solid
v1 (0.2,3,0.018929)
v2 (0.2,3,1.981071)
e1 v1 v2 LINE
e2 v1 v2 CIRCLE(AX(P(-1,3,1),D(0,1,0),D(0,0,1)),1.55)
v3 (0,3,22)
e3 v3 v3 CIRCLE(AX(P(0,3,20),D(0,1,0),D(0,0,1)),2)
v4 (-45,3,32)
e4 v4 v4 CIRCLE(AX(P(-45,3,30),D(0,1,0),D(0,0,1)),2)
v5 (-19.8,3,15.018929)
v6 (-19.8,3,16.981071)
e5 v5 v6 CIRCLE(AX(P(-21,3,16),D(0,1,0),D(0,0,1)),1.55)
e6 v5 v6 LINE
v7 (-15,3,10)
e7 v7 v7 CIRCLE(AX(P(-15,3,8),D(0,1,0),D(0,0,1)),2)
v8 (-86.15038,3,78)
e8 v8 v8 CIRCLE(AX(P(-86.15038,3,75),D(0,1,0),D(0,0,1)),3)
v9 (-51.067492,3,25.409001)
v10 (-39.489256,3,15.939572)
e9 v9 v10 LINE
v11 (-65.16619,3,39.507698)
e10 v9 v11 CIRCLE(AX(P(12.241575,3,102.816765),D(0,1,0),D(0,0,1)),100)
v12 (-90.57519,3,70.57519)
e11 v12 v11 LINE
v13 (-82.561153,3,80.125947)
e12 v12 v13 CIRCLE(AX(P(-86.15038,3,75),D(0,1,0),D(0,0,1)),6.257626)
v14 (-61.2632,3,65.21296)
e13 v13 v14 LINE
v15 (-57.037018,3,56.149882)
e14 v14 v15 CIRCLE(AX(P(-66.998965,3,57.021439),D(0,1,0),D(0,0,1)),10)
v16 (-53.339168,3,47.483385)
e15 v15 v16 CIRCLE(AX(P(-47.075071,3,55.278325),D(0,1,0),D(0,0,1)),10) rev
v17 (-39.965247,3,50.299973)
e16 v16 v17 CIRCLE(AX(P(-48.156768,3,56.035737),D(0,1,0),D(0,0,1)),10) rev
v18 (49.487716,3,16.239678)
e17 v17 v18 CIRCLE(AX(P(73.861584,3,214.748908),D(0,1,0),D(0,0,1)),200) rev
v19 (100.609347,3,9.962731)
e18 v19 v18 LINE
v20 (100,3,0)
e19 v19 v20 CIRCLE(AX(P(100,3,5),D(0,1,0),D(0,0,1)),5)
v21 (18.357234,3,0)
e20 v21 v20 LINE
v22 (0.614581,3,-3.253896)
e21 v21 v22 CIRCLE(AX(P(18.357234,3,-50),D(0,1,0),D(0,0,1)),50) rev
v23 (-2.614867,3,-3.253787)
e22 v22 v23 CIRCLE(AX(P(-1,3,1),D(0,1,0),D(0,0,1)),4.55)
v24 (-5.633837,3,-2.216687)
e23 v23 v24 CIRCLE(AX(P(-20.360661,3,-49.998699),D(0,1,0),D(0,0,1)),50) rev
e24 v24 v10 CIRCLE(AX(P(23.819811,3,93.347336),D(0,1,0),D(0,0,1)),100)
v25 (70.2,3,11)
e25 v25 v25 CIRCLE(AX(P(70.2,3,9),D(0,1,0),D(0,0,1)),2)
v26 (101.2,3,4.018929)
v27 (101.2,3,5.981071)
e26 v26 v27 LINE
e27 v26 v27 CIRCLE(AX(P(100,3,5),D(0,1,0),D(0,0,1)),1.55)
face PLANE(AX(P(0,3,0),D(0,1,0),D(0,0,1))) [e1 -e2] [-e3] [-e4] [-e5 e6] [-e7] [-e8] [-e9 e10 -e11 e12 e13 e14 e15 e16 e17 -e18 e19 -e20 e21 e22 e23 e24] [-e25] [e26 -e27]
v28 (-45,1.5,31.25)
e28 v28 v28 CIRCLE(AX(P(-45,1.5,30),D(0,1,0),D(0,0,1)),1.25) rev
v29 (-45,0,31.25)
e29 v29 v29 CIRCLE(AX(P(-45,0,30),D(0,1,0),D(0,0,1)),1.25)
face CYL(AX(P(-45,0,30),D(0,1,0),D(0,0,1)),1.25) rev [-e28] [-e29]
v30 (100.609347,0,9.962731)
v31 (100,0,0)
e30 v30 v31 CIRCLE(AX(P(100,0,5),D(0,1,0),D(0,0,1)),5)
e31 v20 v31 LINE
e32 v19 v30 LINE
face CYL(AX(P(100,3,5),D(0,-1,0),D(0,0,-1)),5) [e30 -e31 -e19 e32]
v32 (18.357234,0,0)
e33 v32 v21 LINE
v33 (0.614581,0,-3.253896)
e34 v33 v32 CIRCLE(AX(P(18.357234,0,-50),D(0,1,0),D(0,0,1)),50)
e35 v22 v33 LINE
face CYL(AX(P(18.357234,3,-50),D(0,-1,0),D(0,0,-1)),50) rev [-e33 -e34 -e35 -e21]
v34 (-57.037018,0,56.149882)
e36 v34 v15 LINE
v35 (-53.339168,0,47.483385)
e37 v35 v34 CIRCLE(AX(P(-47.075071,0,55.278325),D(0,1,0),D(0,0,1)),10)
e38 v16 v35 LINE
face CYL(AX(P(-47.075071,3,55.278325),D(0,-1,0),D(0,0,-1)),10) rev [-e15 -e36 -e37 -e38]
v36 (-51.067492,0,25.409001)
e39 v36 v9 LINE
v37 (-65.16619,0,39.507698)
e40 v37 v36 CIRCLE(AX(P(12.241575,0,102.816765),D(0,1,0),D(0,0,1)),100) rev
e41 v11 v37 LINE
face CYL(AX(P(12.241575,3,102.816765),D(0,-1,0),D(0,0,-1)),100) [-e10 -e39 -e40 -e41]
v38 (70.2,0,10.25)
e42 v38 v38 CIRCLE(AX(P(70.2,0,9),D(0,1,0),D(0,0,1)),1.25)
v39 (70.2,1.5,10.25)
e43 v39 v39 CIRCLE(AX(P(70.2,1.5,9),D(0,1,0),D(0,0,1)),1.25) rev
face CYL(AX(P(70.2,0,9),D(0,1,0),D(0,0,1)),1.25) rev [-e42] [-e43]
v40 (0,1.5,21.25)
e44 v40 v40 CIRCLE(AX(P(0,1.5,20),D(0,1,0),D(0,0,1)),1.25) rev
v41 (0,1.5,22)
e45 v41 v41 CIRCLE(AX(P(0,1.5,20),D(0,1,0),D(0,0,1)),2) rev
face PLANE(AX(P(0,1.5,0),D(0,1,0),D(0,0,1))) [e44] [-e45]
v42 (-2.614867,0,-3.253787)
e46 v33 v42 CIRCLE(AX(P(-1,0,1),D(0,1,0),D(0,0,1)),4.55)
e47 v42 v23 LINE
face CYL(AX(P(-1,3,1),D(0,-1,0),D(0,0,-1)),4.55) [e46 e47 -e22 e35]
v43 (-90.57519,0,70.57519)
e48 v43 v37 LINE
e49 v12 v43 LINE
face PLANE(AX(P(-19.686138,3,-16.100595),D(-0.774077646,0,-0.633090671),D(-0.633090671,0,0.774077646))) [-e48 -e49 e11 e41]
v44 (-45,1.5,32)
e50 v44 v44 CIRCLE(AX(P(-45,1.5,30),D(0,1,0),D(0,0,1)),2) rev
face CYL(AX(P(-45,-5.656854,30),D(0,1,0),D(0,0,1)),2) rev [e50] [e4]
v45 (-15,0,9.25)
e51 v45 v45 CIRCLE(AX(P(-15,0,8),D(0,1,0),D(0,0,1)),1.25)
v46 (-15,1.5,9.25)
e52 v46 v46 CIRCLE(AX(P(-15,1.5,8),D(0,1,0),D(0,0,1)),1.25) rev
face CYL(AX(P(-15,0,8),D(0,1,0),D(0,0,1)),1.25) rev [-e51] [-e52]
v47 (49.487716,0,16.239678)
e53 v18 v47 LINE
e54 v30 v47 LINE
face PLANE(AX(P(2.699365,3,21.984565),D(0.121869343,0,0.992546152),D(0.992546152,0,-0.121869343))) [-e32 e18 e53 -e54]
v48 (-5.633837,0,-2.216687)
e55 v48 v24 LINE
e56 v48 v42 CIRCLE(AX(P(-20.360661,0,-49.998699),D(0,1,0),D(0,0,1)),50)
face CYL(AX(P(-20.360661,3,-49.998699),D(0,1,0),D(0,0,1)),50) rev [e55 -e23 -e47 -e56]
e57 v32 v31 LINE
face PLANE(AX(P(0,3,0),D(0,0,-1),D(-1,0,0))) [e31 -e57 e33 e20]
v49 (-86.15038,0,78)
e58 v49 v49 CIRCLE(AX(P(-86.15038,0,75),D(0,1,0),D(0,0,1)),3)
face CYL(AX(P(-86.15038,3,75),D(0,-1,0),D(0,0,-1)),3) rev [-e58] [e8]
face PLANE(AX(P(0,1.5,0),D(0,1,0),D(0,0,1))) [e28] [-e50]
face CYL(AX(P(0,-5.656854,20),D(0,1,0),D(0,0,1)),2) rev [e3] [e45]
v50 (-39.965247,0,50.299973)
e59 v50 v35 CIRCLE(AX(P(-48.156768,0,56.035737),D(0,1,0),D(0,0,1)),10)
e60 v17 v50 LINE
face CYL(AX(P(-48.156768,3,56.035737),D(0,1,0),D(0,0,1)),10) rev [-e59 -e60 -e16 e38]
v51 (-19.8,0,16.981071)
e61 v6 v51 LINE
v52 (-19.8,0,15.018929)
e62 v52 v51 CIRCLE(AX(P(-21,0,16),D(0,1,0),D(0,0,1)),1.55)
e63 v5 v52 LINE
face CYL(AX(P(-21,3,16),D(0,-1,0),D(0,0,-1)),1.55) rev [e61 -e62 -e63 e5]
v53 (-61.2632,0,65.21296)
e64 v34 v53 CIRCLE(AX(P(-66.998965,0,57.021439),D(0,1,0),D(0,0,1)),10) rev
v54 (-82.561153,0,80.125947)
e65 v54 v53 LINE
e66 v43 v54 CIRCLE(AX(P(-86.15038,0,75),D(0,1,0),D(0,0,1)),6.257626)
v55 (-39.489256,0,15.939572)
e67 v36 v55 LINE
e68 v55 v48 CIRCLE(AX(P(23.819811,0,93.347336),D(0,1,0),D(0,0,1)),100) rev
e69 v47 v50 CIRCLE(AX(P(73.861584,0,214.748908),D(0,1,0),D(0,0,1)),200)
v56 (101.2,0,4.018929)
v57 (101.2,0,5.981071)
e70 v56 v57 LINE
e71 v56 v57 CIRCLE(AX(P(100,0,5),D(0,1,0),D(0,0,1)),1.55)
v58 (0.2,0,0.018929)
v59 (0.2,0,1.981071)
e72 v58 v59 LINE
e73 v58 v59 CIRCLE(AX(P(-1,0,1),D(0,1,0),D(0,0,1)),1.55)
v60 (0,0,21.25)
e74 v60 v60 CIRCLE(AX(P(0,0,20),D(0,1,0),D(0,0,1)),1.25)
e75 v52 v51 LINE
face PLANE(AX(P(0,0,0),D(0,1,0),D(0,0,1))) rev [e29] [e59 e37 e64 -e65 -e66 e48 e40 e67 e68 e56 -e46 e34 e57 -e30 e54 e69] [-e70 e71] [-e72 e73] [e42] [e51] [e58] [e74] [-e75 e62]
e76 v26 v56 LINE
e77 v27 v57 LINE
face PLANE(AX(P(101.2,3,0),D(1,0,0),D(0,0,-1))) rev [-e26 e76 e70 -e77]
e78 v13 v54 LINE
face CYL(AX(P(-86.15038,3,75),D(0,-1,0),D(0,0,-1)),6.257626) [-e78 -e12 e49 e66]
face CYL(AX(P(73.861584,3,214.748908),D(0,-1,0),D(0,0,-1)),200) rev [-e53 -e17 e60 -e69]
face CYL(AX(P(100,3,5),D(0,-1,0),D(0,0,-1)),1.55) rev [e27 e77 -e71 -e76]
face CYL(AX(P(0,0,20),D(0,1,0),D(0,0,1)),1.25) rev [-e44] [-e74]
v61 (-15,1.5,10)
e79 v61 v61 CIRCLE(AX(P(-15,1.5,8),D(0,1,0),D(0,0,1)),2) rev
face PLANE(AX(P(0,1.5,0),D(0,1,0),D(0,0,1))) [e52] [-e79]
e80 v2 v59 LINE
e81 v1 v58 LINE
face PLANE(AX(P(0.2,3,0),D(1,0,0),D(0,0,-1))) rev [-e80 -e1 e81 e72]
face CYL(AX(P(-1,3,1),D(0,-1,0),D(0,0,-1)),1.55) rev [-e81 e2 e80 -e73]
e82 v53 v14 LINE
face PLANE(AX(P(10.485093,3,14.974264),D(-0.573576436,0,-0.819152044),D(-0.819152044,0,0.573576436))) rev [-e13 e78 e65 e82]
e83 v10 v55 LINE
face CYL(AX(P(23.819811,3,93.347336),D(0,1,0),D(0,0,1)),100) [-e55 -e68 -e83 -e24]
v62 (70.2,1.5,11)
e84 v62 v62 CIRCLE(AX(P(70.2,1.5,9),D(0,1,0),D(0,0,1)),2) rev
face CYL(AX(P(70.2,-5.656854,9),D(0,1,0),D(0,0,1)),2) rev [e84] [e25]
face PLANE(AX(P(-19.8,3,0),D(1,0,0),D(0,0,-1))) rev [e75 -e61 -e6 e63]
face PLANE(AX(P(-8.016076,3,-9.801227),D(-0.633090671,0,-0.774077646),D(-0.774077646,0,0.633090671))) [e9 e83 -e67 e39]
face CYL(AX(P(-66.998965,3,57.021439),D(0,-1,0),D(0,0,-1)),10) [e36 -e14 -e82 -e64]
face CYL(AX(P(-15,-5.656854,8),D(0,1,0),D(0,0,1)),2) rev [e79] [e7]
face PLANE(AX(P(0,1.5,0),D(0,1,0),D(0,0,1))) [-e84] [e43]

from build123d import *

# Parameters (mm, degrees)
SKETCH_3_R          = 3
EXTRUDE_1_DEPTH     = 3
FILLET_1_R          = 200
FILLET_3_R          = 50
SKETCH_4_R          = 1.25
CUT_EXTRUDE_1_DEPTH = 133.803621182
SKETCH_4_3_R        = 2
SKETCH_4_3_R_2      = 1.25
CUT_EXTRUDE_2_DEPTH = 1.5
FILLET_4_R          = 10
FILLET_5_R          = 10
FILLET_6_R          = 100


# Some blends are built 0.0001 mm under size
with BuildPart() as part:
    # 草图3 → 凸台-拉伸1 (new body)
    with BuildSketch(Plane(origin=(0, 0, 0), x_dir=(1, 0, 0), z_dir=(0, 1, 0))):
        with BuildLine():
            ThreePointArc((3.438749824, 0), (-1, 3.55), (-5.438749824, 0))
            Line((-5.438749824, 0), (-20, 0))
            Line((-20, 0), (-58.823128982, -31.75206117))
            Line((-58.823128982, -31.75206117), (-90.575190152, -70.575190152))
            ThreePointArc((-90.575190152, -70.575190152), (-90.944000004, -79.022324522), (-82.561153427, -80.12594721))
            Line((-82.561153427, -80.12594721), (-53.071679833, -59.477195502))
            Line((-53.071679833, -59.477195502), (-58.807444196, -51.285675059))
            Line((-58.807444196, -51.285675059), (-45.701011487, -42.108452077))
            Line((-45.701011487, -42.108452077), (-39.965247124, -50.29997252))
            Line((-39.965247124, -50.29997252), (0, -22.316005218))
            Line((0, -22.316005218), (100.609346717, -9.962730758))
            ThreePointArc((100.609346717, -9.962730758), (104.990673992, -4.694757302), (100, 0))
            Line((100, 0), (3.438749824, 0))
        make_face()
        with BuildLine():
            Line((0.2, -0.018929156), (0.2, -1.981070844))
            ThreePointArc((0.2, -1.981070844), (-2.55, -1), (0.2, -0.018929156))
        make_face(mode=Mode.SUBTRACT)
        with BuildLine():
            ThreePointArc((-19.8, -16.981070844), (-22.55, -16), (-19.8, -15.018929156))
            Line((-19.8, -15.018929156), (-19.8, -16.981070844))
        make_face(mode=Mode.SUBTRACT)
        with BuildLine():
            ThreePointArc((101.2, -5.981070844), (98.45, -5), (101.2, -4.018929156))
            Line((101.2, -4.018929156), (101.2, -5.981070844))
        make_face(mode=Mode.SUBTRACT)
        with Locations(Location((-86.150380304, -75, 0), (0, 0, 270))):
            Circle(SKETCH_3_R, mode=Mode.SUBTRACT)
    extrude(amount=EXTRUDE_1_DEPTH)

    # 圆角1
    # the kernel refuses this fillet: 200 mm, written as the material it adds along each edge
    with BuildSketch(Plane(origin=(0, 0, 22.316005218), x_dir=(-0.8191520442889868, 0, 0.5735764363510532), z_dir=(0, 1, 0))) as fillet_1_piece_1:
        with BuildLine():
            CenterArc((49.871110762, 199.997070178), FILLET_1_R, 242, 27.689869999)
            Line((-44.023201795, 23.407551606), (-45.901088046, 19.875761235))
            Line((-45.901088046, 19.875761235), (-1.877886251, -3.531790371))
            Line((-1.877886251, -3.531790371), (0, -4))
            ThreePointArc((0, -4), (24.394279061, -4), (48.76690707, -3.999941404))
            Line((48.76690707, -3.999941404), (48.788558122, 0))
        make_face()
    extrude(amount=3)

    # 圆角3
    # the kernel refuses this fillet: 50 mm, written as the material it adds along each edge
    with BuildSketch(Plane(origin=(3.438749824, 0, 0), x_dir=(-0.6554771924780477, 0, -0.7552149694895463), z_dir=(0, 1, 0))) as fillet_3_piece_1:
        with BuildLine():
            CenterArc((27.982022488, -44.040522037), FILLET_3_R, 118.259718548, 20.784438328)
            Line((-9.778725986, -11.266662413), (-10.533940956, -10.611185221))
            Line((-10.533940956, -10.611185221), (-0.755214969, 0.655477192))
            Line((-0.755214969, 0.655477192), (0.473469078, 0.880810441))
            ThreePointArc((0.473469078, 0.880810441), (2.154284303, 0.457687505), (3.835099529, 0.880810441))
            Line((3.835099529, 0.880810441), (4.308568607, 0))
        make_face()
    extrude(amount=3)
    with BuildSketch(Plane(origin=(-5.438749824, 0, 0), x_dir=(-1, 0, 0), z_dir=(0, 1, 0))) as fillet_3_piece_2:
        with BuildLine():
            CenterArc((14.921910743, -49.998699223), FILLET_3_R, 90.413290151, 20.374998027)
            Line((-2.823882627, -3.253787011), (-3.178798495, -2.318888767))
            ThreePointArc((-3.178798495, -2.318888767), (-1.757658507, -1.32685396), (-0.975549412, 0.21978022))
            Line((-0.975549412, 0.21978022), (0, 1))
            ThreePointArc((0, 1), (7.280625088, 1), (14.554036965, 0.999973984))
            Line((14.554036965, 0.999973984), (14.561250176, 0))
        make_face()
    extrude(amount=3)

    # 草图4 → 切除-拉伸1 (cut, through all)
    with BuildSketch(Plane(origin=(0, 3, 0), x_dir=(1, 0, 0), z_dir=(0, 1, 0))):
        with Locations(Location((70.2, -9, 0), (0, 0, 270))):
            Circle(SKETCH_4_R)
        with Locations(Location((0, -20, 0), (0, 0, 270))):
            Circle(SKETCH_4_R)
        with Locations(Location((-45, -30, 0), (0, 0, 270))):
            Circle(SKETCH_4_R)
        with Locations(Location((-15, -8, 0), (0, 0, 270))):
            Circle(SKETCH_4_R)
    extrude(amount=-CUT_EXTRUDE_1_DEPTH, mode=Mode.SUBTRACT)

    # 草图4<3> → 切除-拉伸2 (cut)
    # profile 1 of 4: a face of its own
    with BuildSketch(Plane(origin=(0, 3, 0), x_dir=(1, 0, 0), z_dir=(0, 1, 0))):
        with Locations(Location((70.2, -9, 0), (0, 0, 270))):
            Circle(SKETCH_4_3_R)
        with Locations(Location((70.2, -9, 0), (0, 0, 270))):
            Circle(SKETCH_4_3_R_2, mode=Mode.SUBTRACT)
    # profile 2 of 4: a face of its own
    with BuildSketch(Plane(origin=(0, 3, 0), x_dir=(1, 0, 0), z_dir=(0, 1, 0))):
        with Locations(Location((0, -20, 0), (0, 0, 270))):
            Circle(SKETCH_4_3_R)
        with Locations(Location((0, -20, 0), (0, 0, 270))):
            Circle(SKETCH_4_3_R_2, mode=Mode.SUBTRACT)
    # profile 3 of 4: a face of its own
    with BuildSketch(Plane(origin=(0, 3, 0), x_dir=(1, 0, 0), z_dir=(0, 1, 0))):
        with Locations(Location((-45, -30, 0), (0, 0, 270))):
            Circle(SKETCH_4_3_R)
        with Locations(Location((-45, -30, 0), (0, 0, 270))):
            Circle(SKETCH_4_3_R_2, mode=Mode.SUBTRACT)
    # profile 4 of 4: a face of its own
    with BuildSketch(Plane(origin=(0, 3, 0), x_dir=(1, 0, 0), z_dir=(0, 1, 0))):
        with Locations(Location((-15, -8, 0), (0, 0, 270))):
            Circle(SKETCH_4_3_R)
        with Locations(Location((-15, -8, 0), (0, 0, 270))):
            Circle(SKETCH_4_3_R_2, mode=Mode.SUBTRACT)
    extrude(amount=-CUT_EXTRUDE_2_DEPTH, mode=Mode.SUBTRACT)

    # 圆角4
    fillet_4_edges = [part.edges().sort_by_distance(p)[0] for p in [
        (-53.071679833, 1.5, 59.477195502),
    ]]
    fillet(fillet_4_edges, radius=FILLET_4_R - 0.0001)  # a hair under: the kernel refuses the full size

    # 圆角5
    # the kernel refuses this fillet: 10 mm, written as the material it adds along each edge
    with BuildSketch(Plane(origin=(-45.701011487, 0, 42.108452077), x_dir=(-0.8191520442889864, 0, 0.5735764363510539), z_dir=(0, 1, 0))) as fillet_5_piece_1:
        with BuildLine():
            CenterArc((FILLET_5_R, FILLET_5_R), FILLET_5_R, 180, 90)
            Line((0, FILLET_5_R), (0, 0))
            Line((0, 0), (FILLET_5_R, 0))
        make_face()
    extrude(amount=3)
    with BuildSketch(Plane(origin=(-58.807444196, 0, 51.285675059), x_dir=(0.3420261980761126, 0, 0.9396904170148804), z_dir=(0, 1, 0))) as fillet_5_piece_2:
        with BuildLine():
            CenterArc((7.764622652, 9.659249058), FILLET_5_R, 194.999630824, 60.000165399)
            Line((-1.894652287, 7.071120845), (-2.860579781, 6.812308023))
            Line((-2.860579781, 6.812308023), (-0.965927494, -0.258812821))
            Line((-0.965927494, -0.258812821), (0.258812821, -0.965927494))
            ThreePointArc((0.258812821, -0.965927494), (0.258909414, -0.965901613), (4.917575367, -0.965924906))
            Line((4.917575367, -0.965924906), (5.176397847, 0))
        make_face()
    extrude(amount=3)

    # 圆角6
    fillet_6_edges = [part.edges().sort_by_distance(p)[0] for p in [
        (-58.823128982, 1.5, 31.75206117),
        (-20, 1.5, 0),
    ]]
    fillet(fillet_6_edges, radius=FILLET_6_R)


solid = part.part
